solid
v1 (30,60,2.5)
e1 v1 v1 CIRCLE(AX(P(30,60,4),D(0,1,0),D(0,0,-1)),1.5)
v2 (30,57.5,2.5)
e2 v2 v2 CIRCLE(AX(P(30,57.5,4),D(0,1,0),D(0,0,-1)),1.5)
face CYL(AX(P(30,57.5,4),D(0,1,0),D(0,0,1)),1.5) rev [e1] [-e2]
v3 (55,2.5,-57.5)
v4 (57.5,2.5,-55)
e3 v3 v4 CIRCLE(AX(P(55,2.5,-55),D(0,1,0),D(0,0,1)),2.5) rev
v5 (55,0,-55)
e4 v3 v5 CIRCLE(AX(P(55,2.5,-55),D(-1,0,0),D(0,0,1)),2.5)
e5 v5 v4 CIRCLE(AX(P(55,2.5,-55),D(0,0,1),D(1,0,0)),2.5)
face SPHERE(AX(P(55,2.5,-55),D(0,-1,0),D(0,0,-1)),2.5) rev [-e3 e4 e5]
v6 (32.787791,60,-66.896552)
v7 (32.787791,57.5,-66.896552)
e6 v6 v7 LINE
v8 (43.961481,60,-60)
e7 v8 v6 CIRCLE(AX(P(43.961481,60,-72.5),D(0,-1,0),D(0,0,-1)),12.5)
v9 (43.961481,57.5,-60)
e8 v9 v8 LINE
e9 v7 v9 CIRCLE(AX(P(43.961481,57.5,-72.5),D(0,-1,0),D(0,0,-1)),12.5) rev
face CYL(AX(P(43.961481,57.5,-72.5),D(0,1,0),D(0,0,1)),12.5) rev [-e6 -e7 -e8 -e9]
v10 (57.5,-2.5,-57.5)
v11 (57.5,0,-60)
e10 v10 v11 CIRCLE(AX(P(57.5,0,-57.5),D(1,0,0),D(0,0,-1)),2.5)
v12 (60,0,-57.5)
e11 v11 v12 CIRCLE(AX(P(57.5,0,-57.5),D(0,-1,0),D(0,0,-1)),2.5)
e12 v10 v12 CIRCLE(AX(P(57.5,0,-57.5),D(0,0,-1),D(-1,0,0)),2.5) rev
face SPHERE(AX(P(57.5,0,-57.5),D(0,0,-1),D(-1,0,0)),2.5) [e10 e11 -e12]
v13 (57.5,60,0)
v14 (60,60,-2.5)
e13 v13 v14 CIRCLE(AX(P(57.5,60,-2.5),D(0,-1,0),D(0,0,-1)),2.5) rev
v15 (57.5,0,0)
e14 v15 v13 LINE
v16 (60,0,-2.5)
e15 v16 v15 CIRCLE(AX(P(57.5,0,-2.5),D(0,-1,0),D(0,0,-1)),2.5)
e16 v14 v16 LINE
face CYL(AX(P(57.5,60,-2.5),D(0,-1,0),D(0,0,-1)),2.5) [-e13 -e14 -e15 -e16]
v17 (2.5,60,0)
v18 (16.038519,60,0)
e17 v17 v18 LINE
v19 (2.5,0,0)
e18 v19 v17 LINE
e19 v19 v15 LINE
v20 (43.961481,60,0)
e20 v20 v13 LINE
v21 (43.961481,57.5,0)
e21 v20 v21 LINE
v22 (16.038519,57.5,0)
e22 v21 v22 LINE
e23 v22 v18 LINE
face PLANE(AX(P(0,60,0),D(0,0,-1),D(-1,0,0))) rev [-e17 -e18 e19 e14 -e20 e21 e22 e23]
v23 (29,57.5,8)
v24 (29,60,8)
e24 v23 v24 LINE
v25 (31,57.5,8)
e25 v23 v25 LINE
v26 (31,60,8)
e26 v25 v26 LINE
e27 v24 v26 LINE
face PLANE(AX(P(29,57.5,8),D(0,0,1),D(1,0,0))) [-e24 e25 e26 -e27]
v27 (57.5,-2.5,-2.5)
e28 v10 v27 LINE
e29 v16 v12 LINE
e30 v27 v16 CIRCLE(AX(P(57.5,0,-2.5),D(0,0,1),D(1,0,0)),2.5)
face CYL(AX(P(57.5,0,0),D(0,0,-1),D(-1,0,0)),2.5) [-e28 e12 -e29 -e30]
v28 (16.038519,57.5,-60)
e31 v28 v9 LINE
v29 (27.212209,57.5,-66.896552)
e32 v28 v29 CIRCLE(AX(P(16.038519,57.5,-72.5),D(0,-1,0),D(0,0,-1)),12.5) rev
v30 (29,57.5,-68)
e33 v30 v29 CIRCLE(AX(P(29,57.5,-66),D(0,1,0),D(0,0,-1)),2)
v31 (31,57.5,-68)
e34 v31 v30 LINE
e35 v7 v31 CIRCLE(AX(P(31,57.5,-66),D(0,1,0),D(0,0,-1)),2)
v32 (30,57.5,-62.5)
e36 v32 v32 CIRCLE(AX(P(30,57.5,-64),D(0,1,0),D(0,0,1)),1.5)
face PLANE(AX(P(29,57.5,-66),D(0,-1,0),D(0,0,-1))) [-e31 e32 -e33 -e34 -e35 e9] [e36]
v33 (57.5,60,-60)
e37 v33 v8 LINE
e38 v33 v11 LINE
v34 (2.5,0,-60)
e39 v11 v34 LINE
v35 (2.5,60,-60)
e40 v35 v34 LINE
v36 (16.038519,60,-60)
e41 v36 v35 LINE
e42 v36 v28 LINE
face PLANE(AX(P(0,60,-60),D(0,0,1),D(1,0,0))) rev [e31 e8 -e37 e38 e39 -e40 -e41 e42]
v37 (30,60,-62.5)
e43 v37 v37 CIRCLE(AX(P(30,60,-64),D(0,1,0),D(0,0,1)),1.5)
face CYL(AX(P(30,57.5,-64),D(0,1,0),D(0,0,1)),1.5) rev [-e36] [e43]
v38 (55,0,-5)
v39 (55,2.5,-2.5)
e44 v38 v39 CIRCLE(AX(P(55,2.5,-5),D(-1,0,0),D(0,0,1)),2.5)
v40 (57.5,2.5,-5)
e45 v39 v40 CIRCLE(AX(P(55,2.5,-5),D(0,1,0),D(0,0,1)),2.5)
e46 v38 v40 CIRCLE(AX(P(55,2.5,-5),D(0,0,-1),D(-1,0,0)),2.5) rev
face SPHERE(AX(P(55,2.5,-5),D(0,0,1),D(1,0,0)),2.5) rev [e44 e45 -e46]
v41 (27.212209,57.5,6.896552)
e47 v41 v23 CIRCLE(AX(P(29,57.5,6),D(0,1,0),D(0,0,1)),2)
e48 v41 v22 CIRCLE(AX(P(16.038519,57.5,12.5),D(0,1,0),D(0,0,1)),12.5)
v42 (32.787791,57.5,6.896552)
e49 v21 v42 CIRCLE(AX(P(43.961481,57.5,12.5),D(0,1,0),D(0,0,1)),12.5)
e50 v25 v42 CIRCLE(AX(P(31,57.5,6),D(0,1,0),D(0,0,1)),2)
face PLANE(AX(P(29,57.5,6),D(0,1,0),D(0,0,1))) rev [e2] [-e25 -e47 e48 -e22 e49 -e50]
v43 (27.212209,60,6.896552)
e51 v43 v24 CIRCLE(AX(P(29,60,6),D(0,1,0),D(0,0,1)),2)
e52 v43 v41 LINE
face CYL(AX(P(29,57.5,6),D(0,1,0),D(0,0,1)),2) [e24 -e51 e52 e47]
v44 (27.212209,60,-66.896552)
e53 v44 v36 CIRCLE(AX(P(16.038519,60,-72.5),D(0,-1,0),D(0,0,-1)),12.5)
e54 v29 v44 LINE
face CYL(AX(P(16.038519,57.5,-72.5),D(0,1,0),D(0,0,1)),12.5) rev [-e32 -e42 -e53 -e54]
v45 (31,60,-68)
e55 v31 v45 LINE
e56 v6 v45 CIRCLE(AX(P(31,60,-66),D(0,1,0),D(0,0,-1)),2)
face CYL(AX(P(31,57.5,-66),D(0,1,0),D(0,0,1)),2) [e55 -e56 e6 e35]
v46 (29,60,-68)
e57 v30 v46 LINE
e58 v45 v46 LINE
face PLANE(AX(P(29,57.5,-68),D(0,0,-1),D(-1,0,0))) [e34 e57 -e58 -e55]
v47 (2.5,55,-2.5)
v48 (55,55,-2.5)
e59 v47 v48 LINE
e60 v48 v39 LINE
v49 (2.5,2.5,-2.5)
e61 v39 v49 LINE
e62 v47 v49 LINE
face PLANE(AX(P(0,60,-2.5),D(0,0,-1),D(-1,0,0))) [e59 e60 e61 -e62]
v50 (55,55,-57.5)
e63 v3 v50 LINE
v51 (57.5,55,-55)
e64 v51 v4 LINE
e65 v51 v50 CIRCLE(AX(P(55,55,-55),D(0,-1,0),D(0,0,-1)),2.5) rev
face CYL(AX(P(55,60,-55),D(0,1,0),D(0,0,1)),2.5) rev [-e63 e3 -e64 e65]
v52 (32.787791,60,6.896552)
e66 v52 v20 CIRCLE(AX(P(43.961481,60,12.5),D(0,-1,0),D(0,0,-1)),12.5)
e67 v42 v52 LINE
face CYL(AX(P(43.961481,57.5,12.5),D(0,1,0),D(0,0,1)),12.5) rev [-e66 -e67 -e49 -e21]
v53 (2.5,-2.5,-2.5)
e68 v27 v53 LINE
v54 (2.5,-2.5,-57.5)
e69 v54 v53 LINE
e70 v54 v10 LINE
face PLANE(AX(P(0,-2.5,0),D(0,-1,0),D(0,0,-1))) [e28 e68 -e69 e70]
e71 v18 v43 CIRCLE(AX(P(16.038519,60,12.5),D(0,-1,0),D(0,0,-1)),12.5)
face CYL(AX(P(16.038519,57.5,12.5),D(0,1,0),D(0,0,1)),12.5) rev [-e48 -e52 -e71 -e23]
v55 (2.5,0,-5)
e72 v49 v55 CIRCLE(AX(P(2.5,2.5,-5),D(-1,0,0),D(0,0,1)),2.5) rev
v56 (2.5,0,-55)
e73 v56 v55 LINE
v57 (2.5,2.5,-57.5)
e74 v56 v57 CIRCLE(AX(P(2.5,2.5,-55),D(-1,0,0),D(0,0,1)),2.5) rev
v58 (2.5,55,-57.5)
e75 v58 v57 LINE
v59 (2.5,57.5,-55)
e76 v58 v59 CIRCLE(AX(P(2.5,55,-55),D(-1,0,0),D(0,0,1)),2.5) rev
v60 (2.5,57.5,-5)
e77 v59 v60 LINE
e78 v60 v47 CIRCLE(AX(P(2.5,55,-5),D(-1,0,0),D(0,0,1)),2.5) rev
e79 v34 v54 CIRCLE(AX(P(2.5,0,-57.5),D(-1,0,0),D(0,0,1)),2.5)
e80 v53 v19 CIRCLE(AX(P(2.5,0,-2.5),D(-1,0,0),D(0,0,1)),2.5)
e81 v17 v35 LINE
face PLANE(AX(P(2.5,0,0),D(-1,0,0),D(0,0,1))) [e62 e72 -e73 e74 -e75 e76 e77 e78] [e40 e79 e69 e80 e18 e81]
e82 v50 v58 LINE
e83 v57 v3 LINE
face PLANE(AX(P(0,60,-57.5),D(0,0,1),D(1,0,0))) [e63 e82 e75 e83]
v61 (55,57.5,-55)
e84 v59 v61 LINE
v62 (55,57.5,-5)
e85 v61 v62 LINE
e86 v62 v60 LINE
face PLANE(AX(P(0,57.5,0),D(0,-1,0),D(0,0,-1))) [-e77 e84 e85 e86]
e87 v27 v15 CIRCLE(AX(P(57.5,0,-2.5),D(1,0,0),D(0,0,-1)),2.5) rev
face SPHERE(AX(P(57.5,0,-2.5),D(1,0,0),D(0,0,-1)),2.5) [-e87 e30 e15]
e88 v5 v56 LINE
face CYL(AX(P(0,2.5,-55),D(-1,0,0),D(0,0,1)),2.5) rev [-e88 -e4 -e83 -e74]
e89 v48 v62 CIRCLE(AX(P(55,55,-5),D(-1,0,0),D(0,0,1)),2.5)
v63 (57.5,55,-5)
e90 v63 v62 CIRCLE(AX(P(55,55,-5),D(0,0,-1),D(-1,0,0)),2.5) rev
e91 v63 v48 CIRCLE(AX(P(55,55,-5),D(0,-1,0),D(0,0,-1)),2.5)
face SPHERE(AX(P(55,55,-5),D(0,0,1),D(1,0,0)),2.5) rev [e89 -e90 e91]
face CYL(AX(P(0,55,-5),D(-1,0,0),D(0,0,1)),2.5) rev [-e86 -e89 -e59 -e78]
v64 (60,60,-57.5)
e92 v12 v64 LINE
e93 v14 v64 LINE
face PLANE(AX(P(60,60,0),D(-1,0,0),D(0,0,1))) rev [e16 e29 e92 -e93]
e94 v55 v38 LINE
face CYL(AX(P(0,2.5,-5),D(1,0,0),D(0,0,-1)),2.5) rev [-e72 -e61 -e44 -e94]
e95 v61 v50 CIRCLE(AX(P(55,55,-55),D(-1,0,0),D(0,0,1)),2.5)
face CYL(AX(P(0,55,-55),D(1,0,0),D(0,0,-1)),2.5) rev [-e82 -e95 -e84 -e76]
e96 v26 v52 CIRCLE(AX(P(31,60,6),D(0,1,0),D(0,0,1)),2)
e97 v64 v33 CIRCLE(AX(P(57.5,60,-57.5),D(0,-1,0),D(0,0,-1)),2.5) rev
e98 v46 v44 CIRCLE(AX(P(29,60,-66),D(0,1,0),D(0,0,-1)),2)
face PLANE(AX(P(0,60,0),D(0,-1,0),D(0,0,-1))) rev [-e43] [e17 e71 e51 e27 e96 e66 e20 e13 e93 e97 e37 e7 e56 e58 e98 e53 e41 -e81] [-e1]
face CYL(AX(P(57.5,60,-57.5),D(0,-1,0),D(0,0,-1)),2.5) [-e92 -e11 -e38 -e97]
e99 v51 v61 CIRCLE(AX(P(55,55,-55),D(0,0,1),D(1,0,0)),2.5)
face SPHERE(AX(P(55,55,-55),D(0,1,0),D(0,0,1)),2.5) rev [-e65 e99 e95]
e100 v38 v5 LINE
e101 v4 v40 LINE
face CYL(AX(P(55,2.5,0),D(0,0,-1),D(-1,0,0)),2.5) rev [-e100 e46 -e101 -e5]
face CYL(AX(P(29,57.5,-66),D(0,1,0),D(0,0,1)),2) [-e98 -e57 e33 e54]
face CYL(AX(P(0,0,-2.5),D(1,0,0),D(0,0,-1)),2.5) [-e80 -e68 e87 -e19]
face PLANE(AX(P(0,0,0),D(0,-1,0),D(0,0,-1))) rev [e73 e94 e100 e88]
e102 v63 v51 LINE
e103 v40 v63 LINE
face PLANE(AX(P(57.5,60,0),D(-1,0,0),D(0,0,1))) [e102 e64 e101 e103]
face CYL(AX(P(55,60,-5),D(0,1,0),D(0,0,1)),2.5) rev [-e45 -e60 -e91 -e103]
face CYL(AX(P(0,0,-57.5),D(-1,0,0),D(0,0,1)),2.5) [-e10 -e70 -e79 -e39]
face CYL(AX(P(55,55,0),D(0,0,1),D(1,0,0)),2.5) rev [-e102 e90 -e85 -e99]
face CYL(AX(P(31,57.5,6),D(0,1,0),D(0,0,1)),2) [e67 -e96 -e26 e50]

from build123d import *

# Parameters (mm, degrees)
SKETCH1_W           = 60
SKETCH1_H           = 60
BOSS_EXTRUDE1_DEPTH = 60
SHELL1_T            = -2.5
SKETCH5_R           = 1.5
BOSS_EXTRUDE3_DEPTH = 2.5
SKETCH6_W           = 60
SKETCH6_H           = 60
BOSS_EXTRUDE4_DEPTH = 2.5
SKETCH7_W           = 60
SKETCH7_H           = 62.5
CUT_EXTRUDE1_DEPTH  = 2.5
FILLET4_R           = 2.5
FILLET5_R           = 12.5
FILLET6_R           = 2.5


with BuildPart() as part:
    # Sketch1 → Boss-Extrude1 (new body)
    with BuildSketch(Plane(origin=(0, 0, 0), x_dir=(1, 0, 0), z_dir=(0, 1, 0))):
        with Locations((30, 30)):
            Rectangle(SKETCH1_W, SKETCH1_H)
    extrude(amount=BOSS_EXTRUDE1_DEPTH)

    # Shell1
    shell1_openings = [part.faces().sort_by_distance(p)[0] for p in [
        (30, 0, -30),
    ]]
    offset(amount=SHELL1_T, openings=shell1_openings, kind=Kind.INTERSECTION)

    # Sketch5 → Boss-Extrude3 (add)
    # profile 1 of 2: a face of its own
    with BuildSketch(Plane(origin=(0, 60, 0), x_dir=(1, 0, 0), z_dir=(0, 1, 0))):
        with BuildLine():
            Line((27, 60), (27, 66))
            ThreePointArc((27, 66), (27.585786438, 67.414213562), (29, 68))
            Line((29, 68), (31, 68))
            ThreePointArc((31, 68), (32.414213562, 67.414213562), (33, 66))
            Line((33, 66), (33, 60))
            Line((33, 60), (27, 60))
        make_face()
        with Locations(Location((30, 64, 0), (0, 0, 270))):
            Circle(SKETCH5_R, mode=Mode.SUBTRACT)
    # profile 2 of 2: a face of its own
    with BuildSketch(Plane(origin=(0, 60, 0), x_dir=(1, 0, 0), z_dir=(0, 1, 0))):
        with BuildLine():
            Line((33, 0), (27, 0))
            Line((27, 0), (27, -6))
            ThreePointArc((27, -6), (27.585786438, -7.414213562), (29, -8))
            Line((29, -8), (31, -8))
            ThreePointArc((31, -8), (32.414213562, -7.414213562), (33, -6))
            Line((33, -6), (33, 0))
        make_face()
        with Locations(Location((30, -4, 0), (0, 0, 90))):
            Circle(SKETCH5_R, mode=Mode.SUBTRACT)
    extrude(amount=-BOSS_EXTRUDE3_DEPTH)

    # Sketch6 → Boss-Extrude4 (add)
    with BuildSketch(Plane.XZ):
        with Locations((30, -30)):
            Rectangle(SKETCH6_W, SKETCH6_H)
    extrude(amount=BOSS_EXTRUDE4_DEPTH)

    # Sketch7 → Cut-Extrude1 (cut)
    with BuildSketch(Plane.ZY):
        with Locations((-30, 28.75)):
            Rectangle(SKETCH7_W, SKETCH7_H)
    extrude(amount=-CUT_EXTRUDE1_DEPTH, mode=Mode.SUBTRACT)

    # Fillet4
    fillet4_edges = [part.edges().sort_by_distance(p)[0] for p in [
        (31.25, -2.5, 0),
        (60, -2.5, -30),
        (31.25, -2.5, -60),
        (60, 28.75, -60),
        (60, 28.75, 0),
    ]]
    fillet(fillet4_edges, radius=FILLET4_R)

    # Fillet5
    # the kernel refuses this fillet: 12.5 mm, written as the material it adds along each edge
    with BuildSketch(Plane(origin=(27, 60, 0), x_dir=(-1, 0, 0), z_dir=(0, -1, 0)), Plane(origin=(33, 60, -60), x_dir=(1, 0, 0), z_dir=(0, -1, 0))) as fillet5_piece_1:
        with BuildLine():
            CenterArc((10.961481397, -12.5), FILLET5_R, 90, 63.366881251)
            Line((-0.212209463, -6.896551724), (-1.329578548, -6.336206897))
            ThreePointArc((-1.329578548, -6.336206897), (-1.25, -6), (-1.25, 0))
            Line((-1.25, 0), (0, 1.25))
            Line((0, 1.25), (10.961481397, 1.25))
            Line((10.961481397, 1.25), (10.961481397, 0))
        make_face()
    extrude(amount=2.5)
    with BuildSketch(Plane(origin=(33, 60, 0), x_dir=(1, 0, 0), z_dir=(0, -1, 0)), Plane(origin=(27, 60, -60), x_dir=(-1, 0, 0), z_dir=(0, -1, 0))) as fillet5_piece_2:
        with BuildLine():
            CenterArc((10.961481397, 12.5), FILLET5_R, 206.633118749, 63.366881251)
            Line((-0.212209463, 6.896551724), (-1.329578548, 6.336206897))
            ThreePointArc((-1.329578548, 6.336206897), (-1.25, 6), (-1.25, 0))
            Line((-1.25, 0), (0, -1.25))
            Line((0, -1.25), (10.961481397, -1.25))
            Line((10.961481397, -1.25), (10.961481397, 0))
        make_face()
    extrude(amount=2.5)

    # Fillet6
    fillet6_edges = [part.edges().sort_by_distance(p)[0] for p in [
        (30, 0, -2.5),
        (57.5, 0, -30),
        (57.5, 28.75, -2.5),
        (30, 0, -57.5),
        (57.5, 28.75, -57.5),
        (30, 57.5, -2.5),
        (57.5, 57.5, -30),
        (30, 57.5, -57.5),
    ]]
    fillet(fillet6_edges, radius=FILLET6_R)


solid = part.part
